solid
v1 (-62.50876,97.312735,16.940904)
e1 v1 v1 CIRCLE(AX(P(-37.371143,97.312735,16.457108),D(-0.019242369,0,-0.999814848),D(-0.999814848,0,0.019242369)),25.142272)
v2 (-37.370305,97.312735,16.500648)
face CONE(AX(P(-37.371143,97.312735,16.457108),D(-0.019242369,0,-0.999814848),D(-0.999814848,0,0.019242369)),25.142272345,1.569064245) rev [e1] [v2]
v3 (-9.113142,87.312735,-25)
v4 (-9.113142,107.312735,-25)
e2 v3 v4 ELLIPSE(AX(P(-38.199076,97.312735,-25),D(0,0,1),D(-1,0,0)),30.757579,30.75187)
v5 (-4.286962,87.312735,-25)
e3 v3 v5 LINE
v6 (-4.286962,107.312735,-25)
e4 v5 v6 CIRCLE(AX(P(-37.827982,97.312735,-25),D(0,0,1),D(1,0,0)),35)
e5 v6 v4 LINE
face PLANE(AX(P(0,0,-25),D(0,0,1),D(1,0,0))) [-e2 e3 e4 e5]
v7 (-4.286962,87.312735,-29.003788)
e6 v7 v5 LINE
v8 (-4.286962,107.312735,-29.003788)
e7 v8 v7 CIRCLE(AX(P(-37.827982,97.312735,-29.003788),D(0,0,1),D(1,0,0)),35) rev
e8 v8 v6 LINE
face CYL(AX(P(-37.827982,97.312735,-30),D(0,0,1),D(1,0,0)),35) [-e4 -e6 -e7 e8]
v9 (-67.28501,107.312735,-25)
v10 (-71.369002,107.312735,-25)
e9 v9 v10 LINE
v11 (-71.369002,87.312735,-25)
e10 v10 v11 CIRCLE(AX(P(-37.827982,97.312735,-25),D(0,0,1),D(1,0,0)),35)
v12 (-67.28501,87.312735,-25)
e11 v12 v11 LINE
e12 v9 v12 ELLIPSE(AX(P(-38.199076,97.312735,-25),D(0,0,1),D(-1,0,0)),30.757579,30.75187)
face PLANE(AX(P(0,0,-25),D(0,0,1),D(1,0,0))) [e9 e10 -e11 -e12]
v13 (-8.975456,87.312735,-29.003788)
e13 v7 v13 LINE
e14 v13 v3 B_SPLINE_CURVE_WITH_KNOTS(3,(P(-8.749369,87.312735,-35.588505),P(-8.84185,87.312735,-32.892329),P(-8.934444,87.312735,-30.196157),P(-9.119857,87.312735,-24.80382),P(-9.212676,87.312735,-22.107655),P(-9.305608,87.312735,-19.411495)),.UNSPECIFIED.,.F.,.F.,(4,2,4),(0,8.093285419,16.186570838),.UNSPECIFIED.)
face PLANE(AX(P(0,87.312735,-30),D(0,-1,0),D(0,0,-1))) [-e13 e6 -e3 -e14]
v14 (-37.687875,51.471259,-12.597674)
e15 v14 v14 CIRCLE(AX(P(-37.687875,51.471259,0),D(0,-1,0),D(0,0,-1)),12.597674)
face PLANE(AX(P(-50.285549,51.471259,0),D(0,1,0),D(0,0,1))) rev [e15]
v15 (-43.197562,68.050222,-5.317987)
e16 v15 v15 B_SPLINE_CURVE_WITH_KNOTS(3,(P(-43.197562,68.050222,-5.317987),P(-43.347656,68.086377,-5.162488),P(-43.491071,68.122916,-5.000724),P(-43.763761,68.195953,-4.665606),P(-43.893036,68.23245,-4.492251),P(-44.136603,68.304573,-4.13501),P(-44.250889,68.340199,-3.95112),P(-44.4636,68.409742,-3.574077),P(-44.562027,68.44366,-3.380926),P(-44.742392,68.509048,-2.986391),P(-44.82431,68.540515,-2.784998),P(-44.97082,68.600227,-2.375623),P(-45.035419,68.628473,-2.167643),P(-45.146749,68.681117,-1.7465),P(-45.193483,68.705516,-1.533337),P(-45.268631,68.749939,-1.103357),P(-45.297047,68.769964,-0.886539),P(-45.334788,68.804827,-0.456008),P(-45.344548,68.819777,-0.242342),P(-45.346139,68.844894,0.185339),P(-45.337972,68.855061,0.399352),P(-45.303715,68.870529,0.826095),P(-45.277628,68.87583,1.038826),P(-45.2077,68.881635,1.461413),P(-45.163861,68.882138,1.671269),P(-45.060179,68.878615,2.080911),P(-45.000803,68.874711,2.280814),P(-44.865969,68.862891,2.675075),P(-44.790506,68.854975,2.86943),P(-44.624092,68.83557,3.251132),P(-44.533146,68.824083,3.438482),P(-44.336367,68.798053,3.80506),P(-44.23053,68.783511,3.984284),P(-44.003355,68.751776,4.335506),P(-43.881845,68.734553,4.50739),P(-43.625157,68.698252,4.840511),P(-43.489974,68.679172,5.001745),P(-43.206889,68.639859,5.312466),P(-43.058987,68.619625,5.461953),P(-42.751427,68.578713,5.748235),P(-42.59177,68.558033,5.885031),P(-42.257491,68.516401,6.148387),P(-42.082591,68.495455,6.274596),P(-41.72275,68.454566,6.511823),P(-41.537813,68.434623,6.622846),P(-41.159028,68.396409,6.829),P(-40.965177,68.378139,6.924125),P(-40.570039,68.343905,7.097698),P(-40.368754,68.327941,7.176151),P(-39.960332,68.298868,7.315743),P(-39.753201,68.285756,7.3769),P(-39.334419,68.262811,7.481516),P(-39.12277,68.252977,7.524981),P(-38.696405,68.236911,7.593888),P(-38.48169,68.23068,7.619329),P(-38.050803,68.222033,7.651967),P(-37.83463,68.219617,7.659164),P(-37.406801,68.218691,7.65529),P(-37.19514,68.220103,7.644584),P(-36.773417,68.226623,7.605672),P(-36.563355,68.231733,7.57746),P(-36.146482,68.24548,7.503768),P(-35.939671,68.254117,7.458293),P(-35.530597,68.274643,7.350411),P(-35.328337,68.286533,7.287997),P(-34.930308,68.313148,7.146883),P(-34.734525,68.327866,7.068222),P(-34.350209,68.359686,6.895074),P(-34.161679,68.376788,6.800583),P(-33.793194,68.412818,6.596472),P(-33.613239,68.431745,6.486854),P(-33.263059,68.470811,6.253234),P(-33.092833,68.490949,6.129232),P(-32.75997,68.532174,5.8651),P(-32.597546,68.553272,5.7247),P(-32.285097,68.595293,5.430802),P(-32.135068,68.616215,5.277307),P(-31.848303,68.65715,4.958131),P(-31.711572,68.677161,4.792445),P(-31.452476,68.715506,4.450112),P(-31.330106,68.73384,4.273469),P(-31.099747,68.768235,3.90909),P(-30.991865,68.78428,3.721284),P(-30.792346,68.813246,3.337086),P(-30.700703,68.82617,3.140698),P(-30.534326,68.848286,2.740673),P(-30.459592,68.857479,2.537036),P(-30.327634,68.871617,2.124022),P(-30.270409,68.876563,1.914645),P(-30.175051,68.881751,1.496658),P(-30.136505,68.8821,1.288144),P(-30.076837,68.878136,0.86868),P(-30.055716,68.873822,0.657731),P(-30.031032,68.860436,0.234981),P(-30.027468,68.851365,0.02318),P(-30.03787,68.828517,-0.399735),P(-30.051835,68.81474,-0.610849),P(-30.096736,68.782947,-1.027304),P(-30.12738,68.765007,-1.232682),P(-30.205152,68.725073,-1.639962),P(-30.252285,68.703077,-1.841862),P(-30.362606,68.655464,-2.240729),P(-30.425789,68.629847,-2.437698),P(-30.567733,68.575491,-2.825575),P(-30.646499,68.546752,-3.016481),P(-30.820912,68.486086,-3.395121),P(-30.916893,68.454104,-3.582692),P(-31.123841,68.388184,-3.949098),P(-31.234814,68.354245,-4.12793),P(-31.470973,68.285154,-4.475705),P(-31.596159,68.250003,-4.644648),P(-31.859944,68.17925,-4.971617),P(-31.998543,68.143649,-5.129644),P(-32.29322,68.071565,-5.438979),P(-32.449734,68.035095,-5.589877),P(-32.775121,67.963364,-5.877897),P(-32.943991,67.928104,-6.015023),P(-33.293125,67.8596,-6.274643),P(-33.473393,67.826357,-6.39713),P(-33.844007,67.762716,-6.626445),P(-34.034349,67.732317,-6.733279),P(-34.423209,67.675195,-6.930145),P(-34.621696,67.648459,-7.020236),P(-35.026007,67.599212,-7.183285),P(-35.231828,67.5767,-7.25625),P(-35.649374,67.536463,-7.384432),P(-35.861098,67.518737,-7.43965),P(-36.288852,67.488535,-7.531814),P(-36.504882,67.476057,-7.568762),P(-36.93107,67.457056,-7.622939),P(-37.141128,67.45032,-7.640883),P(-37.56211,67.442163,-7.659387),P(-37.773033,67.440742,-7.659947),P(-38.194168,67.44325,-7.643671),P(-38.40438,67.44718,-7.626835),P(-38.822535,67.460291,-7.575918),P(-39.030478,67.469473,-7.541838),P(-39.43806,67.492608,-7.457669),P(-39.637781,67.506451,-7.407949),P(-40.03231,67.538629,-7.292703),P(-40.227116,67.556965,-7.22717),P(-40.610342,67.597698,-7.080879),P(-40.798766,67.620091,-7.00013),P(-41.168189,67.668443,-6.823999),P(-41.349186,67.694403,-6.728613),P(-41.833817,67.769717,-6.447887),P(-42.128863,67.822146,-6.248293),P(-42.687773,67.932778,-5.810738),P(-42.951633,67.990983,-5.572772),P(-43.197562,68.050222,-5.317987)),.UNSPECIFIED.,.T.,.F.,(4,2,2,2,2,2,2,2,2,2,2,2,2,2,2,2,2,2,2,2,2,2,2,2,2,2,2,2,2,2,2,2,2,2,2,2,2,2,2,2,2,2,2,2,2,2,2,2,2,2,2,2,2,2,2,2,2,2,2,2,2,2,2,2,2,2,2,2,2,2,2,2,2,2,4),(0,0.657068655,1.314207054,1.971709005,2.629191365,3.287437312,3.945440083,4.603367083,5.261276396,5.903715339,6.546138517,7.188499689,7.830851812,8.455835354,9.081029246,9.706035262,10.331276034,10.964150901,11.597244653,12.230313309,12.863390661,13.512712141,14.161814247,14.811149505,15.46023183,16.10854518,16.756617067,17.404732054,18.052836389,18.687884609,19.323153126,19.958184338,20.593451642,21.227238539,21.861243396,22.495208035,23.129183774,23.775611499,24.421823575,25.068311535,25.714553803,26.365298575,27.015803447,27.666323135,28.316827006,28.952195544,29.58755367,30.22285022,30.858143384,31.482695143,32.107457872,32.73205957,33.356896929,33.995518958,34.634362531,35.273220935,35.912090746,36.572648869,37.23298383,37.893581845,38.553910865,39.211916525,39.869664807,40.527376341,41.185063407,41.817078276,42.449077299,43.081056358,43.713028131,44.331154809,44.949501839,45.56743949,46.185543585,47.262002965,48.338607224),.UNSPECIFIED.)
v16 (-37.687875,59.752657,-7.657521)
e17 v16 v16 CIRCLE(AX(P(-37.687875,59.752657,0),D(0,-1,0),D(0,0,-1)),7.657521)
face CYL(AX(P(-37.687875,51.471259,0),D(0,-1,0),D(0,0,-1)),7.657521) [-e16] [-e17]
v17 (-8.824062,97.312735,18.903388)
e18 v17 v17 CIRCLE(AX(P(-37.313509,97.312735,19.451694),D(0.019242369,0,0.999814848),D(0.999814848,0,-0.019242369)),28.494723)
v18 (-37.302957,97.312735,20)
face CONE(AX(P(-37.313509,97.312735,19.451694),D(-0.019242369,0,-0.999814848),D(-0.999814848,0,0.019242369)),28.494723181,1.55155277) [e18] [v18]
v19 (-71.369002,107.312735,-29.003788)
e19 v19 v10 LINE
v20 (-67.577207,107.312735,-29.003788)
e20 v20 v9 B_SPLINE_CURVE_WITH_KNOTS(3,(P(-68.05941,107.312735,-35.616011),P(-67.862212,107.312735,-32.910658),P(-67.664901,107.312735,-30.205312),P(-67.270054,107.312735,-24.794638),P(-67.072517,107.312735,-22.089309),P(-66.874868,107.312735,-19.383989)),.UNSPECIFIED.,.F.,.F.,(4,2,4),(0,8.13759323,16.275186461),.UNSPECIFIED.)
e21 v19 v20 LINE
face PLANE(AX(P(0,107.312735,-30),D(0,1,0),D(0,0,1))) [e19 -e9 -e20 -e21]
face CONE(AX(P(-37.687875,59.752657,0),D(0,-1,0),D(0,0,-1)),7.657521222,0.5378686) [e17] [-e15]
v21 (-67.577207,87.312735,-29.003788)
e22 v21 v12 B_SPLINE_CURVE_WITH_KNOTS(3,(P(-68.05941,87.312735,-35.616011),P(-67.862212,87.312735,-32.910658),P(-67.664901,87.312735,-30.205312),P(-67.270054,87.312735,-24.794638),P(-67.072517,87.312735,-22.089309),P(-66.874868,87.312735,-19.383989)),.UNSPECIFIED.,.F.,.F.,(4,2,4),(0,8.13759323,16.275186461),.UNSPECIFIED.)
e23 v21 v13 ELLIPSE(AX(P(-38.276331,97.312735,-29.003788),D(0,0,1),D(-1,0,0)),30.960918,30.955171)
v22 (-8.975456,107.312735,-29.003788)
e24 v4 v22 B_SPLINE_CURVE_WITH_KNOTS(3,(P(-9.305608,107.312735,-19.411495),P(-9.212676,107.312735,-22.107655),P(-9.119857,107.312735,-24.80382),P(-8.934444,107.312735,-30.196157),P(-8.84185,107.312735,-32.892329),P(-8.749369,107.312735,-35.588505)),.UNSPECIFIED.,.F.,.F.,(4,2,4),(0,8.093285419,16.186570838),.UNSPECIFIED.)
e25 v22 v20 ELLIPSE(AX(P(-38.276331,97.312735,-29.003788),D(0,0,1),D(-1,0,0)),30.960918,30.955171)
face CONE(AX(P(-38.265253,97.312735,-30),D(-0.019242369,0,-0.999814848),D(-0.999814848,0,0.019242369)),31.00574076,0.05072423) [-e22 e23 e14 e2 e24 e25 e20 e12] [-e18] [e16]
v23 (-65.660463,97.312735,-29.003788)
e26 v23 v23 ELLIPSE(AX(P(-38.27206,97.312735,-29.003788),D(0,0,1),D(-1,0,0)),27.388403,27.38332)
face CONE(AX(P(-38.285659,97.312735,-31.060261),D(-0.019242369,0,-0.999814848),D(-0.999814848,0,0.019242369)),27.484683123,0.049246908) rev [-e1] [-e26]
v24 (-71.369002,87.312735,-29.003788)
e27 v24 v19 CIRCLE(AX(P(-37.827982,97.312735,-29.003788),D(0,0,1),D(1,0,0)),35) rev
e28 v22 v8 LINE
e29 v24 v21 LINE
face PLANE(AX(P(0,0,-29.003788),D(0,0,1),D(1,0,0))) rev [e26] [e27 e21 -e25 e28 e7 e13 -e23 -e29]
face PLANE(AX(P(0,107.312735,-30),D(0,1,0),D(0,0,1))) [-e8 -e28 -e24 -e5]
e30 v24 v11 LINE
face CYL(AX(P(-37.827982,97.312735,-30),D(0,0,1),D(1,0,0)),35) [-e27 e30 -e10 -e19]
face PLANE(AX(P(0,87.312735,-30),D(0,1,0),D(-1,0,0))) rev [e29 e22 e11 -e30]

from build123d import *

# Parameters (mm, degrees)
BOSS_EXTRUDE9_DEPTH = 5
SKETCH10_W          = 100.017630752
SKETCH10_H          = 82.257490713
CUT_EXTRUDE5_DEPTH  = 5


with BuildPart() as part:
    # Sketch3 → Revolve4 (revolve)
    with BuildSketch(Plane.XY):
        Polygon((-45.345396491, 59.752657492), (-50.285549319, 51.471259135), (-37.687875269, 51.471259135), (-37.687875269, 71.31273478), (-45.345396491, 71.31273478), align=None)
    revolve(axis=Axis((-37.687875269, 51.471259135, 0), (0, 1, 0)))

    # Sketch5 → Revolve5 (revolve)
    with BuildSketch(Plane(origin=(0, 97.31273478, 0), x_dir=(1, 0, 0), z_dir=(0, 1, 0))):
        Polygon((-37.687875269, 0), (-37.302956611, -20), (-65.802956611, -20), (-69.265253256, 29.40337608), (-38.265253256, 30), align=None)
    revolve(axis=Axis((-37.687875269, 97.31273478, 0), (-0.01924236949216868, 0, -0.9998148484676185)))

    # Sketch9 → Boss-Extrude9 (add)
    with BuildSketch(Plane.XY.offset(-25)):
        with BuildLine():
            Line((-9.761081063, 87.31273478), (-4.286962272, 87.31273478))
            ThreePointArc((-4.286962272, 87.31273478), (-2.827981935, 97.31273478), (-4.286962272, 107.31273478))
            Line((-4.286962272, 107.31273478), (-9.761081063, 107.31273478))
            Line((-9.761081063, 107.31273478), (-9.761081063, 87.31273478))
        make_face()
        with BuildLine():
            ThreePointArc((-66.708431797, 87.31273478), (-68.390710613, 97.31273478), (-66.708431797, 107.31273478))
            Line((-66.708431797, 107.31273478), (-71.369001597, 107.31273478))
            ThreePointArc((-71.369001597, 107.31273478), (-72.827981935, 97.31273478), (-71.369001597, 87.31273478))
            Line((-71.369001597, 87.31273478), (-66.708431797, 87.31273478))
        make_face()
    extrude(amount=-BOSS_EXTRUDE9_DEPTH)

    # Sketch10 → Cut-Extrude5 (cut)
    with BuildSketch(Plane.XY.offset(-29.00378798)):
        with Locations((-35.882792004, 102.435950212)):
            Rectangle(SKETCH10_W, SKETCH10_H)
    extrude(amount=-CUT_EXTRUDE5_DEPTH, mode=Mode.SUBTRACT)

    # Sketch6 → Cut-Revolve4 (revolve, cut)
    with BuildSketch(Plane(origin=(0, 97.31273478, 0), x_dir=(1, 0, 0), z_dir=(0, 1, 0))):
        Polygon((-37.370304904, -16.50064803), (-62.508760096, -16.940904481), (-65.765253256, 30.531390366), (-38.285658965, 31.060260794), align=None)
    revolve(axis=Axis((-38.285658965, 97.31273478, -31.060260794), (0.019242369492168804, 0, 0.9998148484676185)), mode=Mode.SUBTRACT)


solid = part.part
